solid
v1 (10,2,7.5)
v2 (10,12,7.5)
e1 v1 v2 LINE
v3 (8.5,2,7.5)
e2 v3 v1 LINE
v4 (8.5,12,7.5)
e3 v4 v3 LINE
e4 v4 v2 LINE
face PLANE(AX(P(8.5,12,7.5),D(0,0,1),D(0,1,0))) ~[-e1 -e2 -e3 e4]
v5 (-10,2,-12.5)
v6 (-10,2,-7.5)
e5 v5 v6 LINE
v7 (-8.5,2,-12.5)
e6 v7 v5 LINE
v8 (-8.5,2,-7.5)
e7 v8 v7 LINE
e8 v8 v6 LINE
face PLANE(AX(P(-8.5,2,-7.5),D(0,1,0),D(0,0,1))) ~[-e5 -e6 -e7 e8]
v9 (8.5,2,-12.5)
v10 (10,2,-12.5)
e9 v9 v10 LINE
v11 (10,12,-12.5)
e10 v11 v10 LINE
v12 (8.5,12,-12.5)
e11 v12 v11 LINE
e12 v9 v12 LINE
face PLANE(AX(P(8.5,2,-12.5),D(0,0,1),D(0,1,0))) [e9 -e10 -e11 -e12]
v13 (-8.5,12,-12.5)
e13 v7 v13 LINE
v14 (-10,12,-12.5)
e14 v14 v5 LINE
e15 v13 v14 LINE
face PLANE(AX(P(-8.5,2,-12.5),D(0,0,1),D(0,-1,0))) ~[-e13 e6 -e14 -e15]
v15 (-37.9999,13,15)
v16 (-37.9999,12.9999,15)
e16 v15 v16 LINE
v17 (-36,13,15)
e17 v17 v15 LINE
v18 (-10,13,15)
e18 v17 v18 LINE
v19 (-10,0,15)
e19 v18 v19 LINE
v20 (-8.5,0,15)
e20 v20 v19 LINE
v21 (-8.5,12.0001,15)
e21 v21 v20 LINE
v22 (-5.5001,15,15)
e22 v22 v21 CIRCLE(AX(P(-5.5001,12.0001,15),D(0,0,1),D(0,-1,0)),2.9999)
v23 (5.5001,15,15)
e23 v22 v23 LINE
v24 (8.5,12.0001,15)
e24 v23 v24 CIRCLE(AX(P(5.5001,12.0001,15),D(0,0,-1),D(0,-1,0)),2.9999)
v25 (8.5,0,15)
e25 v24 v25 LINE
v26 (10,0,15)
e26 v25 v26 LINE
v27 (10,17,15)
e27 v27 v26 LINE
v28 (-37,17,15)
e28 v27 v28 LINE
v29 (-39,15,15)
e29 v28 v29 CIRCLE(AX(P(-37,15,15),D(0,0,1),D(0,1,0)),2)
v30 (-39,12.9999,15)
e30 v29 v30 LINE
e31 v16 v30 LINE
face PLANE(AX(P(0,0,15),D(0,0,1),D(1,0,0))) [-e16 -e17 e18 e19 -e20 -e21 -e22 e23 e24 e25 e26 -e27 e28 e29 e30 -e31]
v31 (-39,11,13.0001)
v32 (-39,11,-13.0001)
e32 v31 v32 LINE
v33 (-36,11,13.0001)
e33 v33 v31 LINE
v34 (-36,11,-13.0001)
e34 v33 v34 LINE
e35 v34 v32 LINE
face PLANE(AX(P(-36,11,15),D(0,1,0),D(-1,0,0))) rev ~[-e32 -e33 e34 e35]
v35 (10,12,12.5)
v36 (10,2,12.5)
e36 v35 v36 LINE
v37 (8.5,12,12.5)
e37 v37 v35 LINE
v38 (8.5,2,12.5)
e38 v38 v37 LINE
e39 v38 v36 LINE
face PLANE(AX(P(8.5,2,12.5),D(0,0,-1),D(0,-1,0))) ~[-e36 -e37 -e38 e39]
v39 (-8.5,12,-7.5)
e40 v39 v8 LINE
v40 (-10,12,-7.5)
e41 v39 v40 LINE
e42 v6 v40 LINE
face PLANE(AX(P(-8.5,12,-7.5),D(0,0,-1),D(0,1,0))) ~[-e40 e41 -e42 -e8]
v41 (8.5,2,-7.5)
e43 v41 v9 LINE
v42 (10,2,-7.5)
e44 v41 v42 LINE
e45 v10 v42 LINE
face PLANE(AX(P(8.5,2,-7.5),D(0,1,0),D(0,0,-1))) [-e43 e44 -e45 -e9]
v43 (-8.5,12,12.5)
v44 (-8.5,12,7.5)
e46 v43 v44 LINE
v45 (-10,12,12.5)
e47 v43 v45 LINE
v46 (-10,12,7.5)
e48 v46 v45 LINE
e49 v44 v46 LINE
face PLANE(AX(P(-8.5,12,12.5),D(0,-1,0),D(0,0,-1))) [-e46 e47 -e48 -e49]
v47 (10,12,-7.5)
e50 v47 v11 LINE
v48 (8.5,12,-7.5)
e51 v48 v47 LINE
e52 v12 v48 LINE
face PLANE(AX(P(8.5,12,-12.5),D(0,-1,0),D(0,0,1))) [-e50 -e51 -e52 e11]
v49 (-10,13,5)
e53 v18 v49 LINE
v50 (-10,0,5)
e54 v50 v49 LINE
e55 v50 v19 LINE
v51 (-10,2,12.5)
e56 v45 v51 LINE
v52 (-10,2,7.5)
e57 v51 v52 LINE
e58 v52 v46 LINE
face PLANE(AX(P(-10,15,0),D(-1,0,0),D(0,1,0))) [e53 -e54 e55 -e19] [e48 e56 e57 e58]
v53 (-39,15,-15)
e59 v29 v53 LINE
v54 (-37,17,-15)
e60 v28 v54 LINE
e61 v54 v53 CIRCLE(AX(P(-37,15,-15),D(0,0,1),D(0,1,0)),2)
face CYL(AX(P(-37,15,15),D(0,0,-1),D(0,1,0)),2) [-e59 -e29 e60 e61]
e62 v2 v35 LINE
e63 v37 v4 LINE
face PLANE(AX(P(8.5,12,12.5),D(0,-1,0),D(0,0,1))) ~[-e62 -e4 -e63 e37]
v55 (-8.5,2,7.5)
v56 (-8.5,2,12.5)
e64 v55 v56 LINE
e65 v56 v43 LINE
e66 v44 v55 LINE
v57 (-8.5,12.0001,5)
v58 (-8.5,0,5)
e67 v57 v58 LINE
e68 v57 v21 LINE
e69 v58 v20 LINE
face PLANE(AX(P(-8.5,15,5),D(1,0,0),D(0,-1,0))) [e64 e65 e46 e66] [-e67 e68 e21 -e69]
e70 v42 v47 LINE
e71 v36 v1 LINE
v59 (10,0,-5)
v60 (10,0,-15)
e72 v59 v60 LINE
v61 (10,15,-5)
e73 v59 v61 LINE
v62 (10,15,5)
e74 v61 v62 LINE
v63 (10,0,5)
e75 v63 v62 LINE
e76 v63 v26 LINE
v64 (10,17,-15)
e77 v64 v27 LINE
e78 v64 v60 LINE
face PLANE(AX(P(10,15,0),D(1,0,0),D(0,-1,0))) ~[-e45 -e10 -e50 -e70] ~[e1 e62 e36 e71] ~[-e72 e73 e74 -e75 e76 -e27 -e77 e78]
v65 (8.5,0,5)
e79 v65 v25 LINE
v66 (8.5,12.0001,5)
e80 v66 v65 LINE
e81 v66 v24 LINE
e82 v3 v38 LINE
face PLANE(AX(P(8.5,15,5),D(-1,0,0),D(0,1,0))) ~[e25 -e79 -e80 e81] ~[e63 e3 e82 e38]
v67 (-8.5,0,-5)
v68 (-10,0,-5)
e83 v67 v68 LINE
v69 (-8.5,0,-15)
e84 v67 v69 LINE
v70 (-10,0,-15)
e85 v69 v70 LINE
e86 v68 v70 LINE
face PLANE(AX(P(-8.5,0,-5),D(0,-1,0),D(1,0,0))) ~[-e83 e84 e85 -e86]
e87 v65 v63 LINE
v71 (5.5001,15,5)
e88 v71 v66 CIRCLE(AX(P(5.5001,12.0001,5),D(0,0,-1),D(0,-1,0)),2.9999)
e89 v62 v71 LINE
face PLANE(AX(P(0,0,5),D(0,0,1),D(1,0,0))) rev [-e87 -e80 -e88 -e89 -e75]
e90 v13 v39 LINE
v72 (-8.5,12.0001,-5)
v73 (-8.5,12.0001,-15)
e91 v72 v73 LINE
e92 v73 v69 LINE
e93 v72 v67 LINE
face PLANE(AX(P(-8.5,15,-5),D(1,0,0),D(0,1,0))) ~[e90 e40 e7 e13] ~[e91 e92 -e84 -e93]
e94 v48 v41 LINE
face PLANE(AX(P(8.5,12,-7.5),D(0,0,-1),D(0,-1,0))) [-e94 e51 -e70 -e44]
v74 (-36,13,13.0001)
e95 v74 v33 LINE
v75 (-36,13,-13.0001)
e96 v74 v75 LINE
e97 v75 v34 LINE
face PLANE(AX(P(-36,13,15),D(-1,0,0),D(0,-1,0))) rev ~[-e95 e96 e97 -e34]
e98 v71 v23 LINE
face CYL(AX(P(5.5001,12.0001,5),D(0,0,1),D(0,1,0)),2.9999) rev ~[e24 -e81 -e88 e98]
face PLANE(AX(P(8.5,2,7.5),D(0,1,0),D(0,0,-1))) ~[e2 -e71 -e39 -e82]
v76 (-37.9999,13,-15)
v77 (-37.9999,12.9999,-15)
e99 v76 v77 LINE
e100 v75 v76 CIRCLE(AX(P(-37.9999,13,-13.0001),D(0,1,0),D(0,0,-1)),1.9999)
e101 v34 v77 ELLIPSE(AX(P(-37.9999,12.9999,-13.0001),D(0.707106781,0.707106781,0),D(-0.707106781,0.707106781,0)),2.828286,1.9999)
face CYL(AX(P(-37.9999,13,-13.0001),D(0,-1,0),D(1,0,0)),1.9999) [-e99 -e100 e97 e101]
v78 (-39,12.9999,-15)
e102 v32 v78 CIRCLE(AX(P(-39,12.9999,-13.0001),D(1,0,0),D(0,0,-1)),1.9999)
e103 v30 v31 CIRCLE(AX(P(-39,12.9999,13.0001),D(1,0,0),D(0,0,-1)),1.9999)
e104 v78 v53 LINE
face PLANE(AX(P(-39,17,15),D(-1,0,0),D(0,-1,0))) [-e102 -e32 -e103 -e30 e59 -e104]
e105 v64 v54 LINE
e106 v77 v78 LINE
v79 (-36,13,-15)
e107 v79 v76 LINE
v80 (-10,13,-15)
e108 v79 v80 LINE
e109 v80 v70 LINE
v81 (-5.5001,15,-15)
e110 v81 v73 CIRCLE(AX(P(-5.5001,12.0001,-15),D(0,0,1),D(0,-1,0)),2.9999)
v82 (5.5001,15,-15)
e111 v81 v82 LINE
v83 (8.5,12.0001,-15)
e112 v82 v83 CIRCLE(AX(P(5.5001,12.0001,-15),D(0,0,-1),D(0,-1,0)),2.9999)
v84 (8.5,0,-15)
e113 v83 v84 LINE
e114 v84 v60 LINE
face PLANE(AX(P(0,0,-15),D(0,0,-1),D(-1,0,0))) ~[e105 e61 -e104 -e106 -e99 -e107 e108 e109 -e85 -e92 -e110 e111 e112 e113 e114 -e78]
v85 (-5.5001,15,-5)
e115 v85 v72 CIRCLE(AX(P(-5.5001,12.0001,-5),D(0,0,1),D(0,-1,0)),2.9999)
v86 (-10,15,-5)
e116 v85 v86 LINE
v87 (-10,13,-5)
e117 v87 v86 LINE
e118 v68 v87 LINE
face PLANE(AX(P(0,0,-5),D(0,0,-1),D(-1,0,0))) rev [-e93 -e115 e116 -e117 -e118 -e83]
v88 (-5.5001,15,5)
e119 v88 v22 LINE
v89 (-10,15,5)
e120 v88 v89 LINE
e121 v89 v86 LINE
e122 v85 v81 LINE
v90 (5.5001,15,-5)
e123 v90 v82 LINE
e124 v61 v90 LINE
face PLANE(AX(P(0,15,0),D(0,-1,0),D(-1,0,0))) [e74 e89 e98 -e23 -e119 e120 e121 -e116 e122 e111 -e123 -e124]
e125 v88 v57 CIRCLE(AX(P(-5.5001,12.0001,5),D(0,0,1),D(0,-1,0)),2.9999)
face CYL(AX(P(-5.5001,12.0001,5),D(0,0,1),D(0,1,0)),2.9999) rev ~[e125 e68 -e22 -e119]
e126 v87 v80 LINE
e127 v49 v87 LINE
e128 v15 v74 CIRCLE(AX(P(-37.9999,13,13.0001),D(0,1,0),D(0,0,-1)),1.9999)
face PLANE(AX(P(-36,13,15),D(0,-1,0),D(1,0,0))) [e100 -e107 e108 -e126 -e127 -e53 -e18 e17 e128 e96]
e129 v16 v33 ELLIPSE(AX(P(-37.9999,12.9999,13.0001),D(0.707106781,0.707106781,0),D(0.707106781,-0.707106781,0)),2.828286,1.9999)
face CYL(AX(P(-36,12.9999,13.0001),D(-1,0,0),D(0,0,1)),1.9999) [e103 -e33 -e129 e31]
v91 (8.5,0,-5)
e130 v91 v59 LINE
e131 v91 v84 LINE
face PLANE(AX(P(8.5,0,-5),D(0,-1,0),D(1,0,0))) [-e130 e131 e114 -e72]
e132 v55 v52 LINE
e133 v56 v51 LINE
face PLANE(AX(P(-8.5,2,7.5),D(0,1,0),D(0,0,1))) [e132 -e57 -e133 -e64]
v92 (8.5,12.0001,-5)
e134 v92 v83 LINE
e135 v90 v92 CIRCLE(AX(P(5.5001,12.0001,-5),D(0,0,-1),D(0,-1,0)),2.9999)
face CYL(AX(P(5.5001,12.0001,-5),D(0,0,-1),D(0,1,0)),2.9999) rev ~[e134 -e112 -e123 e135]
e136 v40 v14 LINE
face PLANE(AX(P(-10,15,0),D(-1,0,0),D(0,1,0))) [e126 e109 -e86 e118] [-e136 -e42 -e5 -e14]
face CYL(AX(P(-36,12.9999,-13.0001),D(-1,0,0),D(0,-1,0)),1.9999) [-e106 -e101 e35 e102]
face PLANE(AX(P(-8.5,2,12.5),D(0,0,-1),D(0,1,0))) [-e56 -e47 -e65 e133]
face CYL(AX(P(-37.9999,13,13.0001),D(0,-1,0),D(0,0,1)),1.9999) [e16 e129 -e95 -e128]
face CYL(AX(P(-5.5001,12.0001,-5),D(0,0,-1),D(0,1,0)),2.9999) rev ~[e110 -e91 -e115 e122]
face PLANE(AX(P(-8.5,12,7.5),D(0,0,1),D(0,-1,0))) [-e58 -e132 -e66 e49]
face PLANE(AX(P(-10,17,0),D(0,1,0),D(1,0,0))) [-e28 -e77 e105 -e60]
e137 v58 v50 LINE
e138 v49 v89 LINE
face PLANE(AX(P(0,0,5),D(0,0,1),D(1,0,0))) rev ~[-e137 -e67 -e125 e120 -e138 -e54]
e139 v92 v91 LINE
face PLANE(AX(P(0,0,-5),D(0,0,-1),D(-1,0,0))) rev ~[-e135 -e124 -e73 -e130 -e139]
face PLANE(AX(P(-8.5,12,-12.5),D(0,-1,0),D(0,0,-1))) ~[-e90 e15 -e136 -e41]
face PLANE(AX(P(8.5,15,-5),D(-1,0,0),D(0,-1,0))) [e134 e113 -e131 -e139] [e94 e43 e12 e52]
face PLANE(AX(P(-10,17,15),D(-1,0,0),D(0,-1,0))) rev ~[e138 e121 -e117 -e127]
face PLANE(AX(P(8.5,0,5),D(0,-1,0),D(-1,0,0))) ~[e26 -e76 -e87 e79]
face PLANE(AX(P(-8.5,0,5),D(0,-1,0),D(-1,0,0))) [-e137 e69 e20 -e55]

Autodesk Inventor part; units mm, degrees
ref_plane "YZ Plane" through (0, 0, 0) normal (1, 0, 0) x (0, 1, 0)
ref_plane "XZ Plane" through (0, 0, 0) normal (0, 1, 0) x (-1, 0, 0)
ref_plane "XY Plane" through (0, 0, 0) normal (0, 0, 1) x (1, 0, 0)
sketch "スケッチ1" plane through (0, 0, 0) normal (0, 0, 1) x (1, 0, 0)
  line L0 (-10, 17) -> (0, 17)
  line L1 (0, 17) -> (0, 15)
  line L2 (0, 15) -> (-10, 15)
  line L3 (-10, 15) -> (-10, 17)
  line L4 (0, -3.4) -> (0, 20.4) projected
  point P0 (0, 0)
  dimension "d0" = 10
  dimension "d1" = 2
  dimension "d2" = 15
extrude "押し出し1" add sketch "スケッチ1" along normal blind 5
sketch "スケッチ2" plane through (0, 0, 5) normal (0, 0, 1) x (1, 0, 0)
  line L0 (0, 17) -> (-10, 17) projected
  line L1 (-10, 17) -> (-8.5, 17)
  line L2 (-8.5, 17) -> (-8.5, 0)
  line L3 (-8.5, 0) -> (-10, 0)
  line L4 (-10, 0) -> (-10, 17)
  line L5 (-10, 15) -> (0, 15) projected
  line L6 (0, 15) -> (0, 17) projected
  line L7 (0, 17) -> (-10, 17) projected
  line L8 (-10, 17) -> (-10, 15) projected
  point P0 (0, 0)
  point P1 (-8.5, 15)
  dimension "d5" = 1.5
extrude "押し出し2" add sketch "スケッチ2" along normal blind 10
sketch "スケッチ3" plane through (-8.5, 0, 5) normal (1, 0, 0) x (0, 0, -1)
  line L0 (-7.5, 12) -> (-2.5, 12)
  line L1 (-2.5, 12) -> (-2.5, 2)
  line L2 (-2.5, 2) -> (-7.5, 2)
  line L3 (-7.5, 2) -> (-7.5, 12)
  line L4 (0, 0) -> (-10, 0) projected
  line L5 (0, 15) -> (-10, 15) projected
  point P0 (5, 0)
  point P1 (-5, 2)
  point P2 (-5, 0)
  dimension "d8" = 2
  dimension "d9" = 5
  dimension "d13" = 3
extrude "押し出し3" cut sketch "スケッチ3" against normal through all
fillet "フィレット1" radius 3 1 edges at (-8.5, 15, 10)
mirror "ミラー1" about plane through (0, 15, 0) normal (1, 0, 0)
mirror "ミラー2" about plane through (-5, 16, 0) normal (0, 0, -1)
sketch "スケッチ4" plane through (0, 0, 15) normal (0, 0, 1) x (1, 0, 0)
  line L0 (-10, 17) -> (-10, 0) projected
  line L1 (-10, 17) -> (-39, 17)
  line L2 (-39, 17) -> (-39, 13)
  line L3 (-39, 13) -> (-10, 13)
  line L4 (-10, 13) -> (-10, 17)
  line L5 (-39, 17) -> (-36, 17)
  line L6 (-36, 17) -> (-36, 11)
  line L7 (-36, 11) -> (-39, 11)
  line L8 (-39, 11) -> (-39, 17)
  point P0 (0, 0)
  point P1 (-36, 13)
  dimension "d14" = 4
  dimension "d15" = 3
  dimension "d16" = 26
  dimension "d17" = 6
extrude "押し出し4" add sketch "スケッチ4" against normal up to surface (30 mm away)
fillet "フィレット2" radius 2 1 edges at (-39, 17, 0)
fillet "フィレット3" radius 2 4 edges at (-36, 12, 15) (-37.5, 11, 15) (-37.5, 11, -15) (-36, 12, -15)
properties part number "connetcor_female_cover"
